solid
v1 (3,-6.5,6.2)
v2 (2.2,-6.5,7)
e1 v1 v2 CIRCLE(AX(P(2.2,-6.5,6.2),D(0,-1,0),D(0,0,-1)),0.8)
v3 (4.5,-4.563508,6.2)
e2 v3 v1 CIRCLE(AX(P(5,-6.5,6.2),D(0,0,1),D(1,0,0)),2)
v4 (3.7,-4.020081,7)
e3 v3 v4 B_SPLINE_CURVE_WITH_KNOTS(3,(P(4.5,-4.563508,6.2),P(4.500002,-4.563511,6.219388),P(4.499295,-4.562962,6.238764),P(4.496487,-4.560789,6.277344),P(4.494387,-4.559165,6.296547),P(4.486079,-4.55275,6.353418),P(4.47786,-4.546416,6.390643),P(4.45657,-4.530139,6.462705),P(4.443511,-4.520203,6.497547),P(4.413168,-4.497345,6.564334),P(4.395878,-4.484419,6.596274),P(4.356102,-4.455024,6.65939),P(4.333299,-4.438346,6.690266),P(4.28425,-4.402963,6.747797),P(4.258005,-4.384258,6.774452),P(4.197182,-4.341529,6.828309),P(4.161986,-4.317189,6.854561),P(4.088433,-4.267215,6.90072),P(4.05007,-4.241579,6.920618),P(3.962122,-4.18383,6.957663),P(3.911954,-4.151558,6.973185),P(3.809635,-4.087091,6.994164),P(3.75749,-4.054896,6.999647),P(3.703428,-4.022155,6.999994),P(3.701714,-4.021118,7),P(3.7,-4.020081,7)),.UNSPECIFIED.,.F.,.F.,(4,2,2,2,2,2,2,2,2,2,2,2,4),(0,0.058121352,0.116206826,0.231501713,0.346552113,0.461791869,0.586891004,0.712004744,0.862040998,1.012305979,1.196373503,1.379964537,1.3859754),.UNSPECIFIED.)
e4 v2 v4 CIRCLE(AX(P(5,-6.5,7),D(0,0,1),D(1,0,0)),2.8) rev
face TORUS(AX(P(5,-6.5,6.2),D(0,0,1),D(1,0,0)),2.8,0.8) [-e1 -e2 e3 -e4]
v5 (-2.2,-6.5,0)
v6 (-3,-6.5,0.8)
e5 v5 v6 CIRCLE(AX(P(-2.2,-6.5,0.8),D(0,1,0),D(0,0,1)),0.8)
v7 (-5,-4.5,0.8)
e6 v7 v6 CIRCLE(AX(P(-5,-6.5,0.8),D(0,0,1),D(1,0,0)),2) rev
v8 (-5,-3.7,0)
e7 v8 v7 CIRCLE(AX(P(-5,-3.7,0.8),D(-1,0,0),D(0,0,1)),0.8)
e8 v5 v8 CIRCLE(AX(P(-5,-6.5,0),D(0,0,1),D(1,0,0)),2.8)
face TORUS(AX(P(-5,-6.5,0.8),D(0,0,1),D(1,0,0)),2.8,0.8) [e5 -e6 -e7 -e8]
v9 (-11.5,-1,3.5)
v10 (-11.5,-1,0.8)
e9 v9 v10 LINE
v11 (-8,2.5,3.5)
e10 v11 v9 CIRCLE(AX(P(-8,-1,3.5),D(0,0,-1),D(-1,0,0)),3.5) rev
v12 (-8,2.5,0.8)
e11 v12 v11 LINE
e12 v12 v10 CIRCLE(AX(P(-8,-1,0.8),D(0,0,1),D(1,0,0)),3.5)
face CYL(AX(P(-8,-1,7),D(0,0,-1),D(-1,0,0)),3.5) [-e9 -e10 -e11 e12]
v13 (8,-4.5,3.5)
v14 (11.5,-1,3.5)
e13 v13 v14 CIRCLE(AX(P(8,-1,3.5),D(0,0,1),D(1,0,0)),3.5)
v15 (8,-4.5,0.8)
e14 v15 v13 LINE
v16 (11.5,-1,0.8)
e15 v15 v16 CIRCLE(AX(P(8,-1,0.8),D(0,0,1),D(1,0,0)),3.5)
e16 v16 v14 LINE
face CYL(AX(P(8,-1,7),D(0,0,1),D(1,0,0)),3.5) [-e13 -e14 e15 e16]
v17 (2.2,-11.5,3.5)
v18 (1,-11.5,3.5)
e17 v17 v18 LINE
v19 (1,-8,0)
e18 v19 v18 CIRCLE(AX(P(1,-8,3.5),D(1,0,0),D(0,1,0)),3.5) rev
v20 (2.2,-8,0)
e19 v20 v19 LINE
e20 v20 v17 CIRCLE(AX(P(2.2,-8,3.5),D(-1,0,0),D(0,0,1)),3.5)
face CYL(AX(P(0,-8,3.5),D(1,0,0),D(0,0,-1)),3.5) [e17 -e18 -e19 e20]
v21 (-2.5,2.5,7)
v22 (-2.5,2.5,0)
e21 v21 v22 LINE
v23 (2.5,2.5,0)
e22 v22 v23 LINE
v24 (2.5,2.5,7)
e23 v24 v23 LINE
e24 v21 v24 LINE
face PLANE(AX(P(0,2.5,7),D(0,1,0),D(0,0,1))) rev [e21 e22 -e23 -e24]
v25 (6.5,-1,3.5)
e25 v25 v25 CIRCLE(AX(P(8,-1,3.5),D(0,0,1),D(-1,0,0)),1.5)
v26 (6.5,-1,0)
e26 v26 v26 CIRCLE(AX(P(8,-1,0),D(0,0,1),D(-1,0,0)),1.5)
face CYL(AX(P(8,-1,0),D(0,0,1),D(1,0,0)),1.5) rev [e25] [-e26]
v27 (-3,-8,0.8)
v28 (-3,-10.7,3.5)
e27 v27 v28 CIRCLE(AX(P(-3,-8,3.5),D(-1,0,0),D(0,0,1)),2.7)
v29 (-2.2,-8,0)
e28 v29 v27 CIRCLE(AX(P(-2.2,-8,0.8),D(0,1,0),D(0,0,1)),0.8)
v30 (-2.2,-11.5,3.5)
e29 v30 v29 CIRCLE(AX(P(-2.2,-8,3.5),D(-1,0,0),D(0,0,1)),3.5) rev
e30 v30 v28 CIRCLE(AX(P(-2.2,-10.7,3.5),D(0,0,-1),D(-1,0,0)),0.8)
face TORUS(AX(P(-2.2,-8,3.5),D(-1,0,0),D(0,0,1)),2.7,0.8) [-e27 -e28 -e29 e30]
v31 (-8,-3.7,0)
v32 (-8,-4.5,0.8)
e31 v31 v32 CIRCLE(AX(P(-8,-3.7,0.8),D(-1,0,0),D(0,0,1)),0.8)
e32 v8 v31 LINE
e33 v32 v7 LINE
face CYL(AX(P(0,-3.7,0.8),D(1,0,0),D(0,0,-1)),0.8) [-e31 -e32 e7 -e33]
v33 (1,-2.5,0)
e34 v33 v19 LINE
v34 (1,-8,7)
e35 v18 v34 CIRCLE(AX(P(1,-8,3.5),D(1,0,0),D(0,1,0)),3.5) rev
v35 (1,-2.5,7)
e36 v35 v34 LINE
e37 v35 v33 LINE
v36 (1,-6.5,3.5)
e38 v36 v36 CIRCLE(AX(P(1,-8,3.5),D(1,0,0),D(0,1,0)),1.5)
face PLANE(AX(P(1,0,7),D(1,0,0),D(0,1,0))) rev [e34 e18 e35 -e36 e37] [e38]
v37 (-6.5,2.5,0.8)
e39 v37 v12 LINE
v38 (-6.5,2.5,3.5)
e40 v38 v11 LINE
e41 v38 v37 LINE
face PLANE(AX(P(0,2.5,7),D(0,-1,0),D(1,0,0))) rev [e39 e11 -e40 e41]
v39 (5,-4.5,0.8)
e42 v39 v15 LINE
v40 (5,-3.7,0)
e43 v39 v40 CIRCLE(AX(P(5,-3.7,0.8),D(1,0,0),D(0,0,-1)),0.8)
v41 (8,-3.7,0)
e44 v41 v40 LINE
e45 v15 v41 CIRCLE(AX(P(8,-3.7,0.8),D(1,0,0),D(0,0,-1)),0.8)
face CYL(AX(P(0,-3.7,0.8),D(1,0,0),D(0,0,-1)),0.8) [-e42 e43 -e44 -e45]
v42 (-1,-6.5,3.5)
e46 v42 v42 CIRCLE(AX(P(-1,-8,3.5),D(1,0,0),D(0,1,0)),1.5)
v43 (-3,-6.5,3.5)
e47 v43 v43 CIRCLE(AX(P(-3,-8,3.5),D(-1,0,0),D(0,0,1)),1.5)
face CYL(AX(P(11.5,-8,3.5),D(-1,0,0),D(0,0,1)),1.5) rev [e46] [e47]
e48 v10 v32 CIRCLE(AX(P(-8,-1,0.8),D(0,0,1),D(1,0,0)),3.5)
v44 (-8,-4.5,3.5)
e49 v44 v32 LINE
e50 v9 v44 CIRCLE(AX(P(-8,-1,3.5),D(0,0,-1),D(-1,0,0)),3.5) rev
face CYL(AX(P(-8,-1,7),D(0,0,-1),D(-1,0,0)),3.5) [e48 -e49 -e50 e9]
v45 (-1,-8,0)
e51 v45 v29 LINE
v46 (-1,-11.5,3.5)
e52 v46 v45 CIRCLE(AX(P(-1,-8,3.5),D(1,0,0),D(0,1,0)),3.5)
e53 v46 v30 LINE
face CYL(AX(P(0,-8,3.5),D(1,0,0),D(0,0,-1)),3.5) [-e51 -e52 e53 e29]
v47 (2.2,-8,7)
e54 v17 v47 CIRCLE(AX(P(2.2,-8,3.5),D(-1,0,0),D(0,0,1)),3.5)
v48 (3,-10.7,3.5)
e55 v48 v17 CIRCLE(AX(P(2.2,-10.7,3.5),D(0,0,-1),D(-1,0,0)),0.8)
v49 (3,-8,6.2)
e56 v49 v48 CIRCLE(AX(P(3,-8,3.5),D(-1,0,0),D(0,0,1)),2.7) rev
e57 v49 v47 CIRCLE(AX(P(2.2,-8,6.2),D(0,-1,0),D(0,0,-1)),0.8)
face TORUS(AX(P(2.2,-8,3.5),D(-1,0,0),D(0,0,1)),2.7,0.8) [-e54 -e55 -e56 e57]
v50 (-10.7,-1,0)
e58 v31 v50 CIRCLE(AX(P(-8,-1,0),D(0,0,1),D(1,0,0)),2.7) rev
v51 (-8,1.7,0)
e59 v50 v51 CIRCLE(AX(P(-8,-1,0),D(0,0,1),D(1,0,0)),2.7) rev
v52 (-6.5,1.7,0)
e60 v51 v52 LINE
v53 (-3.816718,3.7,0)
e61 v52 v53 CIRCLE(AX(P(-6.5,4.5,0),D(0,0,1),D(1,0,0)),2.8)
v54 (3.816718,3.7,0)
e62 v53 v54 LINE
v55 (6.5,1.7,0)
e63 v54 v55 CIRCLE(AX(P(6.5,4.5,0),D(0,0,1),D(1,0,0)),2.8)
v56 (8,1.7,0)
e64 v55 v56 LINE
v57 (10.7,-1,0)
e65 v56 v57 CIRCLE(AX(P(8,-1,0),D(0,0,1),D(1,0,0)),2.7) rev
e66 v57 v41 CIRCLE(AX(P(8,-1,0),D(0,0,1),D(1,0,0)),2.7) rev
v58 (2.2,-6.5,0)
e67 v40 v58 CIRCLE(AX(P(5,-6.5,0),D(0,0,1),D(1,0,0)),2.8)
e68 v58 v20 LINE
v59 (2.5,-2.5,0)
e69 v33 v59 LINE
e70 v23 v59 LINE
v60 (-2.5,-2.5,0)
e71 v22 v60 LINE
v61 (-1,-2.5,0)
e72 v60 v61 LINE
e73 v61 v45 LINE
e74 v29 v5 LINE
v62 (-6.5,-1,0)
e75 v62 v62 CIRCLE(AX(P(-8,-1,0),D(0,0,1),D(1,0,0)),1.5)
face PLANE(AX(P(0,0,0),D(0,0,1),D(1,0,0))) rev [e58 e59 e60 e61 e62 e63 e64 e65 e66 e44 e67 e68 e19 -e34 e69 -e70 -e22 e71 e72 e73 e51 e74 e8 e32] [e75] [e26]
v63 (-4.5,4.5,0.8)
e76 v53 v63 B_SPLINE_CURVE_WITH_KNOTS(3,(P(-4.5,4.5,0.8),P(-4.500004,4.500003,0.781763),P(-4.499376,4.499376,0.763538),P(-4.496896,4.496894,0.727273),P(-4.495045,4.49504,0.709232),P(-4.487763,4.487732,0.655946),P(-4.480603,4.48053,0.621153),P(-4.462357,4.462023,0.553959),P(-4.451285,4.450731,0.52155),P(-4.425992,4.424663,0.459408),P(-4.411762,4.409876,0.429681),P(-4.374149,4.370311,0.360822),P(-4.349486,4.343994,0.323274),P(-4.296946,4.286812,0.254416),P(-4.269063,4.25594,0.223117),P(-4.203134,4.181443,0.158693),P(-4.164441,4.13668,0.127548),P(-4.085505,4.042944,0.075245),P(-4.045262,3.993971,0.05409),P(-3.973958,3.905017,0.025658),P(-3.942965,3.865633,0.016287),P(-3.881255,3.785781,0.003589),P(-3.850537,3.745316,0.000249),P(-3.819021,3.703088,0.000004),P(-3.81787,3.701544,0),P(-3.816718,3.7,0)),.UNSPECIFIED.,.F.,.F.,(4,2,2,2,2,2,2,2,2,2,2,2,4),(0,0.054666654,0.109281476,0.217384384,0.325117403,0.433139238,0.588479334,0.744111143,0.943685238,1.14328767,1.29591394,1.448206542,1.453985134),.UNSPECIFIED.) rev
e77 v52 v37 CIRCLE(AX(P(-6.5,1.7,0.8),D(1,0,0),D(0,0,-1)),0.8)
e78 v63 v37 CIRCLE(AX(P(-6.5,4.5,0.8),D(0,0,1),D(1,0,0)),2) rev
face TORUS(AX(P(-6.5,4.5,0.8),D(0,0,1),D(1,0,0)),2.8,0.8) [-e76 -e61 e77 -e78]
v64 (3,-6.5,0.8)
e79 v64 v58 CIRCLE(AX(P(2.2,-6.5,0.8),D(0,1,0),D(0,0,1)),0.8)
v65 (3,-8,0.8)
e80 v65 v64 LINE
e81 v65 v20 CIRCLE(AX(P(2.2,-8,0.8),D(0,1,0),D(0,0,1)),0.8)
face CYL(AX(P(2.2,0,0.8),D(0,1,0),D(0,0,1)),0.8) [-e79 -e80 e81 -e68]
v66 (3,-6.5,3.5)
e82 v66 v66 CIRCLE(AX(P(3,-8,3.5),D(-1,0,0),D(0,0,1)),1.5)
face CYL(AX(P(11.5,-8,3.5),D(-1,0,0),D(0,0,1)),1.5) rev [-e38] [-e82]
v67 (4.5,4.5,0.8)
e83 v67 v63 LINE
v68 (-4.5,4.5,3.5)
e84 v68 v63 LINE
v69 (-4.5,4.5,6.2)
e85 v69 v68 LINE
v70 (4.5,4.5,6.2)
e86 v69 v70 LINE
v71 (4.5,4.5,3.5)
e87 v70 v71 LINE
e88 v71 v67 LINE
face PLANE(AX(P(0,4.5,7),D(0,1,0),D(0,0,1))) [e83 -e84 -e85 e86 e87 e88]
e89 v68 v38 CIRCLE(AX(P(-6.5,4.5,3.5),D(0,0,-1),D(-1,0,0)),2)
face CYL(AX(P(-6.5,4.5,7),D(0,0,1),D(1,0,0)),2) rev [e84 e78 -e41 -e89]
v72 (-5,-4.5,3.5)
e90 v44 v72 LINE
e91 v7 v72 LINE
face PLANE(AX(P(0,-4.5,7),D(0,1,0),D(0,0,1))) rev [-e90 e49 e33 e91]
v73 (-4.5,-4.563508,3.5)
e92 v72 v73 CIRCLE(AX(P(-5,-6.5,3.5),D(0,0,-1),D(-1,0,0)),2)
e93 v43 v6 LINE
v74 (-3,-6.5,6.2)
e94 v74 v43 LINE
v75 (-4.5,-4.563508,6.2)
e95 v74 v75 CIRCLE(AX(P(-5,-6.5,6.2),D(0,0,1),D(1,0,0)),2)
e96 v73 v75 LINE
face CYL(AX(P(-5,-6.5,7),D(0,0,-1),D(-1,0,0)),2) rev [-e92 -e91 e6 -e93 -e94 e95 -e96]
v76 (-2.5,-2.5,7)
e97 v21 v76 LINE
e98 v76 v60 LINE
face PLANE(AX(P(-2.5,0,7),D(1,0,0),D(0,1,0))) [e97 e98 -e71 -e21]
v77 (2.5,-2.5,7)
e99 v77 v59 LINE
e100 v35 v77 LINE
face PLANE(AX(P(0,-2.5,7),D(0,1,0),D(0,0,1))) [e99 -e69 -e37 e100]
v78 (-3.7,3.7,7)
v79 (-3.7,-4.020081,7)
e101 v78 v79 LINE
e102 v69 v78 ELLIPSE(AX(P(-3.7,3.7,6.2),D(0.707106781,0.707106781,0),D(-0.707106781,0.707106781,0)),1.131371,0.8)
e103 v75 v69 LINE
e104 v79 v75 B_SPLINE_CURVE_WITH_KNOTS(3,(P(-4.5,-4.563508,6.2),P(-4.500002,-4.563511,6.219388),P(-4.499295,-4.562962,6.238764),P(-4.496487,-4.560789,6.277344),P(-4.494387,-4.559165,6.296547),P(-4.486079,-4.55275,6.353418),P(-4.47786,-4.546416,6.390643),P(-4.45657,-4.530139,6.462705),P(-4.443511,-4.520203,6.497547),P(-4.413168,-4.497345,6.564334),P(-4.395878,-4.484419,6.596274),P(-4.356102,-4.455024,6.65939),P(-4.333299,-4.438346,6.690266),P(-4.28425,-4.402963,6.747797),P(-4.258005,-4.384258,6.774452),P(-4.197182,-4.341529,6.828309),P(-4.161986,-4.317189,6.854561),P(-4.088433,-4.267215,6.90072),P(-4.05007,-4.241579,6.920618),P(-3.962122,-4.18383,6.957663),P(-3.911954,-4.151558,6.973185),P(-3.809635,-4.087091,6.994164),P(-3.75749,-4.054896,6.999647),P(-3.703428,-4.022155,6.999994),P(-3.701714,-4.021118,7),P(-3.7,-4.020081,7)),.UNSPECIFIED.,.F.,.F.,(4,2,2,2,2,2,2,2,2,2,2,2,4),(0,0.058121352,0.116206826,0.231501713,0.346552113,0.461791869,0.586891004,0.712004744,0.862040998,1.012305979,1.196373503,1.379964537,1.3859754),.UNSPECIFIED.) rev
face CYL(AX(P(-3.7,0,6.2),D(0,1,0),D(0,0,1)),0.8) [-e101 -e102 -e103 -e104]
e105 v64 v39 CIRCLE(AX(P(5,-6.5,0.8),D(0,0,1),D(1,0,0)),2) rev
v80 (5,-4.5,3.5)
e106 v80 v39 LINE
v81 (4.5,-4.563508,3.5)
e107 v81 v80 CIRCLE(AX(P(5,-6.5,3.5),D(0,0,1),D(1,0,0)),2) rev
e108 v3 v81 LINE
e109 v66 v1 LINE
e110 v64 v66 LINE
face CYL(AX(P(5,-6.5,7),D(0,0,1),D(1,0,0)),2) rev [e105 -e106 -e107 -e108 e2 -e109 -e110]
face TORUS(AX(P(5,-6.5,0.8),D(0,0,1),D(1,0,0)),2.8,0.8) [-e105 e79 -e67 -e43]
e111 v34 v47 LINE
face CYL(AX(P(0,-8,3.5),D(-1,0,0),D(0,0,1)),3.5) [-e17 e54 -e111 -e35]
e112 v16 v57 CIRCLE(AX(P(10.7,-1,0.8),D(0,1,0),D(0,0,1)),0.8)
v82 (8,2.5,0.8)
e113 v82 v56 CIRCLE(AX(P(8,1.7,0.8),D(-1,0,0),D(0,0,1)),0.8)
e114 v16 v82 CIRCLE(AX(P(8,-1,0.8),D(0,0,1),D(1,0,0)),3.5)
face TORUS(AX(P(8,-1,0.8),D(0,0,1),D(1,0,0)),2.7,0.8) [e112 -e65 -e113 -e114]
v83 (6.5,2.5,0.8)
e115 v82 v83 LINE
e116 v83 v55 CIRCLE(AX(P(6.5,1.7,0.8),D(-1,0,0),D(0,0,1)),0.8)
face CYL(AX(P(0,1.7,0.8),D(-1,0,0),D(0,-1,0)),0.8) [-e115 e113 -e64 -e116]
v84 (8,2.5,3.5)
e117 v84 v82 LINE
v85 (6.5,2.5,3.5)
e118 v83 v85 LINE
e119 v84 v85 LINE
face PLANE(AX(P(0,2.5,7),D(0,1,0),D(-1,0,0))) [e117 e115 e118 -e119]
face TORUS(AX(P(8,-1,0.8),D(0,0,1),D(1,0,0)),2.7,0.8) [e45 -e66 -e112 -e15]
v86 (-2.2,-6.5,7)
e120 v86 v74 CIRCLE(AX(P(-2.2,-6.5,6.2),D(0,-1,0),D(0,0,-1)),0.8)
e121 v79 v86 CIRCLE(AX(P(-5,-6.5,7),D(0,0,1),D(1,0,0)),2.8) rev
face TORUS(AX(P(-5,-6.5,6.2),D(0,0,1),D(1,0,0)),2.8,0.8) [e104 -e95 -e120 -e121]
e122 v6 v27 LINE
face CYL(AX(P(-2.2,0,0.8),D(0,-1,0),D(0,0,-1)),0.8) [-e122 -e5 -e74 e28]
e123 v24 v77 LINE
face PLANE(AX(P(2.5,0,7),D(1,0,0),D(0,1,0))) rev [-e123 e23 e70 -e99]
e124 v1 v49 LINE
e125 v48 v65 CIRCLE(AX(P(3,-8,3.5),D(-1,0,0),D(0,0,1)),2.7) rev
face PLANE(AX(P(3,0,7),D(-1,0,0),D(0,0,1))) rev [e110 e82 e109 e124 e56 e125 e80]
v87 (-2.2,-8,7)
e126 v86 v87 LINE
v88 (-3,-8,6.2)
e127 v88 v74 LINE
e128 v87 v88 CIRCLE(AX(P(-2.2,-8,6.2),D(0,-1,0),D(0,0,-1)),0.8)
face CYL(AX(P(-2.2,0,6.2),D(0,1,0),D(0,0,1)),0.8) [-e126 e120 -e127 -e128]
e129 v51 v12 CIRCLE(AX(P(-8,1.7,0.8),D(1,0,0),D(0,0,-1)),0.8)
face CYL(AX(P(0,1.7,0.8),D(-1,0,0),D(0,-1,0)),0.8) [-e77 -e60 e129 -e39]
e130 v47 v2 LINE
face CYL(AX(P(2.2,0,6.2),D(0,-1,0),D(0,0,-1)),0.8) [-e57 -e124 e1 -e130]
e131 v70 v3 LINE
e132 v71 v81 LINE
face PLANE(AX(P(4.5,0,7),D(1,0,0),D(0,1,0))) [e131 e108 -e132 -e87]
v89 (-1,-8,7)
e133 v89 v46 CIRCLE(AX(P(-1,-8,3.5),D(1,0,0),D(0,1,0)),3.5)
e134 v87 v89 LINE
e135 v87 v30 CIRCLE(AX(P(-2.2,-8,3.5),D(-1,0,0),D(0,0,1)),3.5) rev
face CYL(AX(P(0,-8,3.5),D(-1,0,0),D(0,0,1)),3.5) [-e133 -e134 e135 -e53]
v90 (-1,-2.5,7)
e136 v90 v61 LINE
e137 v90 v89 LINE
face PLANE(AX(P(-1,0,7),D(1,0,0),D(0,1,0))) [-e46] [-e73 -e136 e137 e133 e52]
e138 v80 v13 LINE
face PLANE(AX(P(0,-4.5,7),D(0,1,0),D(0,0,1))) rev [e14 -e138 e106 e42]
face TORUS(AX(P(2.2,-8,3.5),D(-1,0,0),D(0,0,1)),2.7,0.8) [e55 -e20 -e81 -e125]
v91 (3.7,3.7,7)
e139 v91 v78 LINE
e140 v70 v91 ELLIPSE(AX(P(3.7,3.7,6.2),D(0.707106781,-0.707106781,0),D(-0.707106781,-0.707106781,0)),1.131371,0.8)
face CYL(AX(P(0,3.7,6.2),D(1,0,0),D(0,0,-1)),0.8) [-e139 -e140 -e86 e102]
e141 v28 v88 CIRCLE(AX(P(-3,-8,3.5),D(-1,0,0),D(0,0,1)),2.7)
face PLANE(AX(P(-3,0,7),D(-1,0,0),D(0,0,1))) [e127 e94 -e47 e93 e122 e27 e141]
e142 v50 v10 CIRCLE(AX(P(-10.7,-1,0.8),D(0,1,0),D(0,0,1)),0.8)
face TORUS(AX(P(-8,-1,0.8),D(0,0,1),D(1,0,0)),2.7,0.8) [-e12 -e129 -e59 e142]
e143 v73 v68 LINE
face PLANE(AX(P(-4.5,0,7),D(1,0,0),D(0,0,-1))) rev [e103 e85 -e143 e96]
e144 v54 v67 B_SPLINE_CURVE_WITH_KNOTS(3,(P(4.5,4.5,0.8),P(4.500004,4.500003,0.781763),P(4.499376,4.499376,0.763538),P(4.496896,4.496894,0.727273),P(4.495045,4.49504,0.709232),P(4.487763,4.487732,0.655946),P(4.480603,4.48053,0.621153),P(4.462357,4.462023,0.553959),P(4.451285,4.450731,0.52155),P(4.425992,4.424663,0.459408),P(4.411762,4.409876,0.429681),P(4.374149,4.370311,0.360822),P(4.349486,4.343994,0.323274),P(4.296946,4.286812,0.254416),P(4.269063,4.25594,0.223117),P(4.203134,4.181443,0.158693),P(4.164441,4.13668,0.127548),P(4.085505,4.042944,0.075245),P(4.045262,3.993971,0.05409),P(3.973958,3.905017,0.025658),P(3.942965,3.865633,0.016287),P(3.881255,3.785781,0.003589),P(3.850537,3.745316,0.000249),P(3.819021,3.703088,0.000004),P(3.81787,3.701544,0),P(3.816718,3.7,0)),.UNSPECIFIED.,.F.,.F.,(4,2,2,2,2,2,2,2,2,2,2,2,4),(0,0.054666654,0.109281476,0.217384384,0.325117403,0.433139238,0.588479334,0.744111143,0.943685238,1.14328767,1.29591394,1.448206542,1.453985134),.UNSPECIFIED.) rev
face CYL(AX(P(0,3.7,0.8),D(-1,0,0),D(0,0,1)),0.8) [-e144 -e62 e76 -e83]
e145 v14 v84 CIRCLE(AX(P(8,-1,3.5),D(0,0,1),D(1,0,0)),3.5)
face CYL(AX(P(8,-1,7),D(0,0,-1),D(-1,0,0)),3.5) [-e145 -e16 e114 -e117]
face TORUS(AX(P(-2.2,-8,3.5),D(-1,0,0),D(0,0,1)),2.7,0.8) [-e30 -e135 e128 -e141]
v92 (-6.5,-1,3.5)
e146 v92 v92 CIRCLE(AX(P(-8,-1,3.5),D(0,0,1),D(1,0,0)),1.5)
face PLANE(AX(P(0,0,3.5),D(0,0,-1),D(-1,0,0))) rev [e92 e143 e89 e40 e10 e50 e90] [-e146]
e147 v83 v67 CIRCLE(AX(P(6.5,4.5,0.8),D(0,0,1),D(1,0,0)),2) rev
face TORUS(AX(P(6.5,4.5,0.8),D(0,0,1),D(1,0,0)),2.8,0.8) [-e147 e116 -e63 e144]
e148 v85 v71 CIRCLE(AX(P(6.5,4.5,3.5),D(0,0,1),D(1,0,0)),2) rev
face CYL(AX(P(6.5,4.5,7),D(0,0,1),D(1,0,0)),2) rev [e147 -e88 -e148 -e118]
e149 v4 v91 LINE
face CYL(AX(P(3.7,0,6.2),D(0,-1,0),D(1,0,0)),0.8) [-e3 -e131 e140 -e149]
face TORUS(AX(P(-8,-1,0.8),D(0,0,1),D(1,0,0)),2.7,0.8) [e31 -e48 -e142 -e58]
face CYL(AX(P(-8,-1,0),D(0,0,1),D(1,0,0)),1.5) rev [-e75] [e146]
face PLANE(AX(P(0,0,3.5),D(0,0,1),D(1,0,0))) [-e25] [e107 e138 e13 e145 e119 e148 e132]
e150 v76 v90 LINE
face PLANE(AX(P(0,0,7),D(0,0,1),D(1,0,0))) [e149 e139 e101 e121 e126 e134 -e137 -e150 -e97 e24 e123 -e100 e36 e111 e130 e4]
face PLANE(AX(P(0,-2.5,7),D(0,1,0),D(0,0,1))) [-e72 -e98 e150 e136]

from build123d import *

# Parameters (mm, degrees)
EXTRUDE_1_DEPTH     = 7
CUT_EXTRUDE_1_DEPTH = 3.5
FILLET_1_R          = 3.5
SKETCH_3_R          = 1.4999999999999996
CUT_EXTRUDE_2_DEPTH = 17.635804759614125
SKETCH_4_R          = 1.5000000000000002
CUT_EXTRUDE_3_DEPTH = 20.786358937409375
FILLET_2_R          = 2
FILLET_3_R          = 2
FILLET_4_R          = 0.8


# Some blends are built 0.0001 mm under size
with BuildPart() as part:
    # 草图1 → 凸台-拉伸1 (new body)
    with BuildSketch(Plane.XY):
        Polygon((-2.5000000000000004, -2.4999999999999996), (-2.5000000000000013, 2.5000000000000004), (-4.499999999999999, 2.4999999999999996), (-4.499999999999999, -4.500000000000002), (-2.9999999999999973, -4.500000000000002), (-0.9999999999999982, -4.500000000000002), (-0.9999999999999986, -2.4999999999999987), align=None)
        Polygon((-4.499999999999999, 2.4999999999999996), (-2.5000000000000013, 2.5000000000000004), (2.4999999999999987, 2.5000000000000004), (4.500000000000001, 2.4999999999999996), (4.500000000000001, 4.499999999999998), (-4.499999999999999, 4.499999999999998), align=None)
        Polygon((4.500000000000001, 2.4999999999999996), (2.4999999999999987, 2.5000000000000004), (2.4999999999999996, -2.4999999999999996), (0.9999999999999987, -2.4999999999999996), (0.9999999999999982, -4.500000000000002), (2.9999999999999973, -4.500000000000002), (4.500000000000001, -4.500000000000002), align=None)
        Polygon((-0.9999999999999982, -4.500000000000002), (-2.9999999999999973, -4.500000000000002), (-2.9999999999999973, -11.500000000000004), (-0.9999999999999972, -11.500000000000004), align=None)
        Polygon((2.9999999999999973, -4.500000000000002), (0.9999999999999982, -4.500000000000002), (0.9999999999999972, -11.500000000000004), (2.9999999999999973, -11.500000000000004), align=None)
        Polygon((-4.499999999999999, -4.500000000000002), (-4.499999999999999, 2.4999999999999996), (-11.499999999999996, 2.499999999999997), (-11.499999999999996, -4.5000000000000036), align=None)
        Polygon((11.499999999999996, 2.499999999999997), (4.500000000000001, 2.4999999999999996), (4.500000000000002, -4.500000000000002), (11.499999999999996, -4.5000000000000036), align=None)
    extrude(amount=EXTRUDE_1_DEPTH)

    # 草图2 → 切除-拉伸1 (cut)
    with BuildSketch(Plane.XY.offset(7)):
        Polygon((-4.499999999999999, 2.4999999999999996), (-4.499999999999999, -4.500000000000002), (-11.499999999999996, -4.5000000000000036), (-11.499999999999996, 2.499999999999997), align=None)
        Polygon((4.500000000000001, 2.5), (4.500000000000001, -4.500000000000002), (11.499999999999996, -4.5000000000000036), (11.499999999999996, 2.499999999999997), align=None)
    extrude(amount=-CUT_EXTRUDE_1_DEPTH, mode=Mode.SUBTRACT)

    # 圆角1
    fillet_1_edges = [part.edges().sort_by_distance(p)[0] for p in [
        (1.9999999999999973, -11.500000000000004, 0),
        (1.9999999999999973, -11.500000000000004, 7),
        (-1.9999999999999973, -11.500000000000004, 0),
        (-1.9999999999999973, -11.500000000000004, 7),
        (11.499999999999996, -4.5000000000000036, 1.75),
        (11.499999999999996, 2.499999999999997, 1.75),
        (-11.499999999999996, -4.5000000000000036, 1.75),
        (-11.499999999999996, 2.499999999999997, 1.75),
    ]]
    fillet(fillet_1_edges, radius=FILLET_1_R - 0.0001)  # a hair under: the kernel refuses the full size

    # 草图3 → 切除-拉伸2 (cut, through all)
    with BuildSketch(Plane.XY.offset(3.5)):
        with Locations((-7.9999999999999964, -1.0000000000000013)):
            Circle(SKETCH_3_R)
        with Locations(Location((7.9999999999999964, -1.0000000000000013, 0), (0, 0, 180))):
            Circle(SKETCH_3_R)
    extrude(amount=-CUT_EXTRUDE_2_DEPTH, mode=Mode.SUBTRACT)

    # 草图4 → 切除-拉伸3 (cut, through all)
    with BuildSketch(Plane.ZY.offset(2.9999999999999973)):
        with Locations((3.5, -8.000000000000004)):
            Circle(SKETCH_4_R)
    extrude(amount=-CUT_EXTRUDE_3_DEPTH, mode=Mode.SUBTRACT)

    # 圆角2
    fillet_2_edges = [part.edges().sort_by_distance(p)[0] for p in [
        (4.500000000000001, 2.4999999999999996, 1.75),
        (-4.499999999999999, 2.4999999999999996, 1.75),
    ]]
    fillet(fillet_2_edges, radius=FILLET_2_R - 0.0001)  # a hair under: the kernel refuses the full size

    # 圆角3
    fillet_3_edges = [part.edges().sort_by_distance(p)[0] for p in [
        (2.9999999999999973, -4.500000000000002, 3.5),
        (-2.9999999999999973, -4.500000000000002, 3.5),
    ]]
    fillet(fillet_3_edges, radius=FILLET_3_R)

    # 圆角4
    # the kernel refuses this fillet: 0.8 mm, written as the material it takes off along each edge
    with BuildSketch(Plane(origin=(-2.9999999999999973, -6.500000000000002, 0), x_dir=(1, 0, 0), z_dir=(0, -1, 0))) as fillet_4_piece_1:
        with BuildLine():
            CenterArc((FILLET_4_R, FILLET_4_R), FILLET_4_R, 180, 90)
            Line((0, FILLET_4_R), (0, 0))
            Line((0, 0), (FILLET_4_R, 0))
        make_face()
    extrude(amount=1.5001000000000015, mode=Mode.SUBTRACT)
    with BuildSketch(Plane(origin=(-4.9999999999999964, -4.500000000000002, 0), x_dir=(-2.1e-16, 1, 0), z_dir=(-1, -2.1e-16, 0)), Plane(origin=(8.000099999999996, -4.500000000000003, 0), x_dir=(2.1e-16, 1, 0), z_dir=(-1, 2.1e-16, 0))) as fillet_4_piece_2:
        with BuildLine():
            CenterArc((FILLET_4_R, -FILLET_4_R), FILLET_4_R, 90, 90)
            Line((0, -FILLET_4_R), (0, 0))
            Line((0, 0), (FILLET_4_R, 0))
        make_face()
    extrude(amount=3.0000999999999998, mode=Mode.SUBTRACT)
    with BuildSketch(Plane(origin=(-8.000099999999996, -0.9999000000000016, 0), x_dir=(-1, -6e-17, 0), z_dir=(6e-17, -1, 0))) as fillet_4_piece_3:
        with BuildLine():
            CenterArc((3.4999000000000002 - FILLET_4_R, -FILLET_4_R), FILLET_4_R, 7.95e-15, 90)
            Line((3.4999000000000002, -FILLET_4_R), (3.4999000000000002, 0))
            Line((3.4999000000000002, 0), (3.4999000000000002 - FILLET_4_R, 0))
        make_face()
    revolve(axis=Axis((-8.000099999999996, -0.9999000000000016, 0), (0, 0, -1)), revolution_arc=90, mode=Mode.SUBTRACT)
    with BuildSketch(Plane(origin=(-8.000099999999996, -1.0001000000000024, 0), x_dir=(0, -1, 0), z_dir=(1, 0, 0))) as fillet_4_piece_4:
        with BuildLine():
            CenterArc((3.4998999999999993 - FILLET_4_R, -FILLET_4_R), FILLET_4_R, 7.95e-15, 90)
            Line((3.4998999999999993, -FILLET_4_R), (3.4998999999999993, 0))
            Line((3.4998999999999993, 0), (3.4998999999999993 - FILLET_4_R, 0))
        make_face()
    revolve(axis=Axis((-8.000099999999996, -1.0001000000000024, 0), (0, 0, -1)), revolution_arc=90, mode=Mode.SUBTRACT)
    with BuildSketch(Plane(origin=(8.000099999999996, -0.999900000000002, 0), x_dir=(1, -6e-17, 0), z_dir=(-6e-17, -1, 0))) as fillet_4_piece_5:
        with BuildLine():
            CenterArc((3.4999000000000002 - FILLET_4_R, FILLET_4_R), FILLET_4_R, 270, 89.99999999999999)
            Line((3.4999000000000002, FILLET_4_R), (3.4999000000000002, 0))
            Line((3.4999000000000002, 0), (3.4999000000000002 - FILLET_4_R, 0))
        make_face()
    revolve(axis=Axis((8.000099999999996, -0.999900000000002, 0), (0, 0, 1)), revolution_arc=89.99999999999997, mode=Mode.SUBTRACT)
    with BuildSketch(Plane(origin=(8.000099999999996, -1.0001000000000024, 0), x_dir=(1, 1.9e-16, 0), z_dir=(-1.9e-16, 1, 0))) as fillet_4_piece_6:
        with BuildLine():
            CenterArc((3.4999000000000002 - FILLET_4_R, -FILLET_4_R), FILLET_4_R, 7.95e-15, 90)
            Line((3.4999000000000002, -FILLET_4_R), (3.4999000000000002, 0))
            Line((3.4999000000000002, 0), (3.4999000000000002 - FILLET_4_R, 0))
        make_face()
    revolve(axis=Axis((8.000099999999996, -1.0001000000000024, 0), (0, 0, -1)), revolution_arc=90, mode=Mode.SUBTRACT)
    with BuildSketch(Plane(origin=(-2.9999999999999973, -6.500000000000002, 7), x_dir=(1, 0, 0), z_dir=(0, -1, 0))) as fillet_4_piece_7:
        with BuildLine():
            CenterArc((FILLET_4_R, -FILLET_4_R), FILLET_4_R, 90, 90)
            Line((0, -FILLET_4_R), (0, 0))
            Line((0, 0), (FILLET_4_R, 0))
        make_face()
    extrude(amount=1.5001000000000015, mode=Mode.SUBTRACT)
    with BuildSketch(Plane(origin=(-2.9999999999999973, -8.000100000000003, 3.5001000000000007), x_dir=(0, 0, 1), z_dir=(0, 1, 0))) as fillet_4_piece_8:
        with BuildLine():
            CenterArc((3.4998999999999993 - FILLET_4_R, FILLET_4_R), FILLET_4_R, 270, 90)
            Line((3.4998999999999993, FILLET_4_R), (3.4998999999999993, 0))
            Line((3.4998999999999993, 0), (3.4998999999999993 - FILLET_4_R, 0))
        make_face()
    revolve(axis=Axis((-2.9999999999999973, -8.000100000000003, 3.5001000000000007), (1, 0, 0)), revolution_arc=90, mode=Mode.SUBTRACT)
    with BuildSketch(Plane(origin=(-2.9999999999999973, -8.000100000000003, 3.4998999999999993), x_dir=(0, -1, 0), z_dir=(0, 0, 1))) as fillet_4_piece_9:
        with BuildLine():
            CenterArc((3.4999000000000002 - FILLET_4_R, FILLET_4_R), FILLET_4_R, 270, 90)
            Line((3.4999000000000002, FILLET_4_R), (3.4999000000000002, 0))
            Line((3.4999000000000002, 0), (3.4999000000000002 - FILLET_4_R, 0))
        make_face()
    revolve(axis=Axis((-2.9999999999999973, -8.000100000000003, 3.4998999999999993), (1, 0, 0)), revolution_arc=90, mode=Mode.SUBTRACT)
    with BuildSketch(Plane(origin=(8.000099999999998, 2.4999999999999982, 0), x_dir=(-3.8e-16, -1, 0), z_dir=(-1, 3.8e-16, 0))) as fillet_4_piece_10:
        with BuildLine():
            CenterArc((FILLET_4_R, FILLET_4_R), FILLET_4_R, 180, 90)
            Line((0, FILLET_4_R), (0, 0))
            Line((0, 0), (FILLET_4_R, 0))
        make_face()
    extrude(amount=1.5001999999999978, mode=Mode.SUBTRACT)
    with BuildSketch(Plane(origin=(-6.4998999999999985, 2.4999999999999987, 0), x_dir=(3.8e-16, -1, 0), z_dir=(-1, -3.8e-16, 0))) as fillet_4_piece_11:
        with BuildLine():
            CenterArc((FILLET_4_R, FILLET_4_R), FILLET_4_R, 180, 90)
            Line((-4.4e-16, FILLET_4_R), (0, 0))
            Line((0, 0), (FILLET_4_R, 0))
        make_face()
    extrude(amount=1.5001999999999978, mode=Mode.SUBTRACT)
    with BuildSketch(Plane(origin=(6.499900000000001, 4.4998999999999985, 0), x_dir=(-1, 0, 0), z_dir=(0, 1, 0))) as fillet_4_piece_12:
        with BuildLine():
            CenterArc((1.9999000000000002 + FILLET_4_R, FILLET_4_R), FILLET_4_R, 180, 90)
            Line((1.9999000000000002, FILLET_4_R), (1.9999000000000002, 0))
            Line((1.9999000000000002, 0), (1.9999000000000002 + FILLET_4_R, 0))
        make_face()
    revolve(axis=Axis((6.499900000000001, 4.4998999999999985, 0), (0, 0, 1)), revolution_arc=89.99999999999994, mode=Mode.SUBTRACT)
    with BuildSketch(Plane(origin=(-6.499899999999999, 4.4998999999999985, 0), x_dir=(1, 0, 0), z_dir=(0, 1, 0))) as fillet_4_piece_13:
        with BuildLine():
            CenterArc((1.9999000000000002 + FILLET_4_R, -FILLET_4_R), FILLET_4_R, 90, 90)
            Line((1.9999000000000002, -FILLET_4_R), (1.9999000000000002, 0))
            Line((1.9999000000000002, 0), (1.9999000000000002 + FILLET_4_R, 0))
        make_face()
    revolve(axis=Axis((-6.499899999999999, 4.4998999999999985, 0), (0, 0, -1)), revolution_arc=89.99999999999994, mode=Mode.SUBTRACT)
    with BuildSketch(Plane(origin=(4.9999999999999964, -6.500000000000002, 0), x_dir=(-1, 0, 0), z_dir=(0, -1, 0))) as fillet_4_piece_14:
        with BuildLine():
            CenterArc((2 + FILLET_4_R, -FILLET_4_R), FILLET_4_R, 90, 90)
            Line((1.9999999999999991, -FILLET_4_R), (2, 0))
            Line((2, 0), (2 + FILLET_4_R, 0))
        make_face()
    revolve(axis=Axis((4.9999999999999964, -6.500000000000002, 0), (0, 0, -1)), revolution_arc=90, mode=Mode.SUBTRACT)
    with BuildSketch(Plane(origin=(4.9999999999999964, -6.500000000000002, 7), x_dir=(-1, 0, 0), z_dir=(0, -1, 0))) as fillet_4_piece_15:
        with BuildLine():
            CenterArc((2 + FILLET_4_R, FILLET_4_R), FILLET_4_R, 180, 90)
            Line((1.9999999999999991, FILLET_4_R), (2, 0))
            Line((2, 0), (2 + FILLET_4_R, 0))
        make_face()
    revolve(axis=Axis((4.9999999999999964, -6.500000000000002, 7), (0, 0, -1)), revolution_arc=132.8344729120862, mode=Mode.SUBTRACT)
    with BuildSketch(Plane(origin=(-4.9999999999999964, -6.500000000000002, 0), x_dir=(0, 1, 0), z_dir=(-1, 0, 0))) as fillet_4_piece_16:
        with BuildLine():
            CenterArc((2 + FILLET_4_R, -FILLET_4_R), FILLET_4_R, 90, 90)
            Line((2 + FILLET_4_R, 1.1e-16), (2, 0))
            Line((2, 0), (2, -FILLET_4_R))
        make_face()
    revolve(axis=Axis((-4.9999999999999964, -6.500000000000002, 0), (0, 0, -1)), revolution_arc=90, mode=Mode.SUBTRACT)
    with BuildSketch(Plane(origin=(-4.9999999999999964, -6.500000000000002, 7), x_dir=(-0.679882641435008, 0.7333209351132398, 0), z_dir=(-0.7333209351132398, -0.679882641435008, 0))) as fillet_4_piece_17:
        with BuildLine():
            CenterArc((1.9999999999999993 + FILLET_4_R, FILLET_4_R), FILLET_4_R, 180, 90)
            Line((1.9999999999999991, FILLET_4_R), (1.9999999999999993, 0))
            Line((1.9999999999999993, 0), (1.9999999999999993 + FILLET_4_R, 0))
        make_face()
    revolve(axis=Axis((-4.9999999999999964, -6.500000000000002, 7), (0, 0, -1)), revolution_arc=132.83447291208606, mode=Mode.SUBTRACT)
    with BuildSketch(Plane(origin=(6.500000000000002, 4.499999999999998, 0), x_dir=(0, 0, 1), z_dir=(-1, 0, 0))) as fillet_4_piece_18:
        with BuildLine():
            CenterArc((FILLET_4_R, -FILLET_4_R), FILLET_4_R, 90, 90)
            Line((-1.1e-16, -FILLET_4_R), (0, 0))
            Line((0, 0), (FILLET_4_R, 0))
        make_face()
    extrude(amount=13, mode=Mode.SUBTRACT)
    with BuildSketch(Plane(origin=(4.500000000000002, -6.563508326896292, 7), x_dir=(-1, 0, 0), z_dir=(0, 1, 0))) as fillet_4_piece_19:
        with BuildLine():
            CenterArc((FILLET_4_R, -FILLET_4_R), FILLET_4_R, 90, 90)
            Line((-8.9e-16, -FILLET_4_R), (0, 0))
            Line((0, 0), (FILLET_4_R, 0))
        make_face()
    extrude(amount=13.06350832689629, mode=Mode.SUBTRACT)
    with BuildSketch(Plane(origin=(6.500000000000002, 4.499999999999998, 7), x_dir=(0, -1, 0), z_dir=(-1, 0, 0))) as fillet_4_piece_20:
        with BuildLine():
            CenterArc((FILLET_4_R, -FILLET_4_R), FILLET_4_R, 90, 90)
            Line((0, -FILLET_4_R), (0, 0))
            Line((0, 0), (FILLET_4_R, 0))
        make_face()
    extrude(amount=13, mode=Mode.SUBTRACT)
    with BuildSketch(Plane(origin=(-4.499999999999999, 6.499999999999998, 7), x_dir=(0, 0, -1), z_dir=(0, -1, 0))) as fillet_4_piece_21:
        with BuildLine():
            CenterArc((FILLET_4_R, FILLET_4_R), FILLET_4_R, 180, 90)
            Line((0, FILLET_4_R), (0, 0))
            Line((0, 0), (FILLET_4_R, 0))
        make_face()
    extrude(amount=13.063508326896292, mode=Mode.SUBTRACT)
    with BuildSketch(Plane(origin=(2.9999999999999973, -8.000100000000003, 0), x_dir=(-1, 0, 0), z_dir=(0, 1, 0))) as fillet_4_piece_22:
        with BuildLine():
            CenterArc((FILLET_4_R, FILLET_4_R), FILLET_4_R, 180, 90)
            Line((0, FILLET_4_R), (0, 0))
            Line((0, 0), (FILLET_4_R, 0))
        make_face()
    extrude(amount=1.5001000000000015, mode=Mode.SUBTRACT)
    with BuildSketch(Plane(origin=(2.9999999999999973, -8.000100000000003, 7), x_dir=(-1, 0, 0), z_dir=(0, 1, 0))) as fillet_4_piece_23:
        with BuildLine():
            CenterArc((FILLET_4_R, -FILLET_4_R), FILLET_4_R, 90, 90)
            Line((0, -FILLET_4_R), (0, 0))
            Line((0, 0), (FILLET_4_R, 0))
        make_face()
    extrude(amount=1.5001000000000015, mode=Mode.SUBTRACT)
    with BuildSketch(Plane(origin=(2.9999999999999973, -8.000100000000003, 3.5001000000000007), x_dir=(0, 0, 1), z_dir=(0, 1, 0))) as fillet_4_piece_24:
        with BuildLine():
            CenterArc((3.4998999999999993 - FILLET_4_R, -FILLET_4_R), FILLET_4_R, 0, 90)
            Line((3.4998999999999993, -FILLET_4_R), (3.4998999999999993, 0))
            Line((3.4998999999999993, 0), (3.4998999999999993 - FILLET_4_R, 0))
        make_face()
    revolve(axis=Axis((2.9999999999999973, -8.000100000000003, 3.5001000000000007), (1, 0, 0)), revolution_arc=90, mode=Mode.SUBTRACT)
    with BuildSketch(Plane(origin=(2.9999999999999973, -8.000100000000003, 3.4998999999999993), x_dir=(0, -1, 0), z_dir=(0, 0, 1))) as fillet_4_piece_25:
        with BuildLine():
            CenterArc((3.4999000000000002 - FILLET_4_R, -FILLET_4_R), FILLET_4_R, 0, 90)
            Line((3.4999000000000002, -FILLET_4_R), (3.4999000000000002, 0))
            Line((3.4999000000000002, 0), (3.4999000000000002 - FILLET_4_R, 0))
        make_face()
    revolve(axis=Axis((2.9999999999999973, -8.000100000000003, 3.4998999999999993), (1, 0, 0)), revolution_arc=90, mode=Mode.SUBTRACT)
    with BuildSketch(Plane(origin=(2.9999999999999973, -11.500000000000004, 3.4998999999999993), x_dir=(0, 1, 0), z_dir=(0, 0, 1))) as fillet_4_piece_26:
        with BuildLine():
            CenterArc((FILLET_4_R, FILLET_4_R), FILLET_4_R, 180, 90)
            Line((0, FILLET_4_R), (0, 0))
            Line((0, 0), (FILLET_4_R, 0))
        make_face()
    extrude(amount=0.00020000000000131, mode=Mode.SUBTRACT)
    with BuildSketch(Plane(origin=(-4.499999999999999, 4.4998999999999985, 0), x_dir=(0, 0, 1), z_dir=(0, 1, 0))) as fillet_4_piece_27:
        with BuildLine():
            CenterArc((FILLET_4_R, FILLET_4_R), FILLET_4_R, 180, 90)
            Line((-1.1e-16, FILLET_4_R), (0, 0))
            Line((0, 0), (FILLET_4_R, 0))
        make_face()
    extrude(amount=2.0000999999999998, mode=Mode.SUBTRACT)
    with BuildSketch(Plane(origin=(4.5, 6.499999999999998, 0), x_dir=(-1, -1e-16, 0), z_dir=(1e-16, -1, 0))) as fillet_4_piece_28:
        with BuildLine():
            CenterArc((FILLET_4_R, -FILLET_4_R), FILLET_4_R, 90, 90)
            Line((-8.9e-16, -FILLET_4_R), (0, 0))
            Line((0, 0), (FILLET_4_R, 0))
        make_face()
    extrude(amount=2.0001000000000007, mode=Mode.SUBTRACT)
    with BuildSketch(Plane(origin=(-2.9999999999999973, -11.500000000000004, 3.4998999999999993), x_dir=(0, 1, 0), z_dir=(0, 0, 1))) as fillet_4_piece_29:
        with BuildLine():
            CenterArc((FILLET_4_R, -FILLET_4_R), FILLET_4_R, 90, 90)
            Line((0, -FILLET_4_R), (0, 0))
            Line((0, 0), (FILLET_4_R, 0))
        make_face()
    extrude(amount=0.00020000000000131, mode=Mode.SUBTRACT)
    with BuildSketch(Plane(origin=(11.499999999999996, -1.0001000000000024, 0), x_dir=(-1, 0, 0), z_dir=(0, 1, 0))) as fillet_4_piece_30:
        with BuildLine():
            CenterArc((FILLET_4_R, FILLET_4_R), FILLET_4_R, 180, 90)
            Line((0, FILLET_4_R), (0, 0))
            Line((0, 0), (FILLET_4_R, 0))
        make_face()
    extrude(amount=0.00020000000000042, mode=Mode.SUBTRACT)
    with BuildSketch(Plane(origin=(-11.499999999999996, -0.9999000000000016, 0), x_dir=(1, 0, 0), z_dir=(0, -1, 0))) as fillet_4_piece_31:
        with BuildLine():
            CenterArc((FILLET_4_R, FILLET_4_R), FILLET_4_R, 180, 90)
            Line((0, FILLET_4_R), (0, 0))
            Line((0, 0), (FILLET_4_R, 0))
        make_face()
    extrude(amount=0.00020000000000131, mode=Mode.SUBTRACT)


solid = part.part
